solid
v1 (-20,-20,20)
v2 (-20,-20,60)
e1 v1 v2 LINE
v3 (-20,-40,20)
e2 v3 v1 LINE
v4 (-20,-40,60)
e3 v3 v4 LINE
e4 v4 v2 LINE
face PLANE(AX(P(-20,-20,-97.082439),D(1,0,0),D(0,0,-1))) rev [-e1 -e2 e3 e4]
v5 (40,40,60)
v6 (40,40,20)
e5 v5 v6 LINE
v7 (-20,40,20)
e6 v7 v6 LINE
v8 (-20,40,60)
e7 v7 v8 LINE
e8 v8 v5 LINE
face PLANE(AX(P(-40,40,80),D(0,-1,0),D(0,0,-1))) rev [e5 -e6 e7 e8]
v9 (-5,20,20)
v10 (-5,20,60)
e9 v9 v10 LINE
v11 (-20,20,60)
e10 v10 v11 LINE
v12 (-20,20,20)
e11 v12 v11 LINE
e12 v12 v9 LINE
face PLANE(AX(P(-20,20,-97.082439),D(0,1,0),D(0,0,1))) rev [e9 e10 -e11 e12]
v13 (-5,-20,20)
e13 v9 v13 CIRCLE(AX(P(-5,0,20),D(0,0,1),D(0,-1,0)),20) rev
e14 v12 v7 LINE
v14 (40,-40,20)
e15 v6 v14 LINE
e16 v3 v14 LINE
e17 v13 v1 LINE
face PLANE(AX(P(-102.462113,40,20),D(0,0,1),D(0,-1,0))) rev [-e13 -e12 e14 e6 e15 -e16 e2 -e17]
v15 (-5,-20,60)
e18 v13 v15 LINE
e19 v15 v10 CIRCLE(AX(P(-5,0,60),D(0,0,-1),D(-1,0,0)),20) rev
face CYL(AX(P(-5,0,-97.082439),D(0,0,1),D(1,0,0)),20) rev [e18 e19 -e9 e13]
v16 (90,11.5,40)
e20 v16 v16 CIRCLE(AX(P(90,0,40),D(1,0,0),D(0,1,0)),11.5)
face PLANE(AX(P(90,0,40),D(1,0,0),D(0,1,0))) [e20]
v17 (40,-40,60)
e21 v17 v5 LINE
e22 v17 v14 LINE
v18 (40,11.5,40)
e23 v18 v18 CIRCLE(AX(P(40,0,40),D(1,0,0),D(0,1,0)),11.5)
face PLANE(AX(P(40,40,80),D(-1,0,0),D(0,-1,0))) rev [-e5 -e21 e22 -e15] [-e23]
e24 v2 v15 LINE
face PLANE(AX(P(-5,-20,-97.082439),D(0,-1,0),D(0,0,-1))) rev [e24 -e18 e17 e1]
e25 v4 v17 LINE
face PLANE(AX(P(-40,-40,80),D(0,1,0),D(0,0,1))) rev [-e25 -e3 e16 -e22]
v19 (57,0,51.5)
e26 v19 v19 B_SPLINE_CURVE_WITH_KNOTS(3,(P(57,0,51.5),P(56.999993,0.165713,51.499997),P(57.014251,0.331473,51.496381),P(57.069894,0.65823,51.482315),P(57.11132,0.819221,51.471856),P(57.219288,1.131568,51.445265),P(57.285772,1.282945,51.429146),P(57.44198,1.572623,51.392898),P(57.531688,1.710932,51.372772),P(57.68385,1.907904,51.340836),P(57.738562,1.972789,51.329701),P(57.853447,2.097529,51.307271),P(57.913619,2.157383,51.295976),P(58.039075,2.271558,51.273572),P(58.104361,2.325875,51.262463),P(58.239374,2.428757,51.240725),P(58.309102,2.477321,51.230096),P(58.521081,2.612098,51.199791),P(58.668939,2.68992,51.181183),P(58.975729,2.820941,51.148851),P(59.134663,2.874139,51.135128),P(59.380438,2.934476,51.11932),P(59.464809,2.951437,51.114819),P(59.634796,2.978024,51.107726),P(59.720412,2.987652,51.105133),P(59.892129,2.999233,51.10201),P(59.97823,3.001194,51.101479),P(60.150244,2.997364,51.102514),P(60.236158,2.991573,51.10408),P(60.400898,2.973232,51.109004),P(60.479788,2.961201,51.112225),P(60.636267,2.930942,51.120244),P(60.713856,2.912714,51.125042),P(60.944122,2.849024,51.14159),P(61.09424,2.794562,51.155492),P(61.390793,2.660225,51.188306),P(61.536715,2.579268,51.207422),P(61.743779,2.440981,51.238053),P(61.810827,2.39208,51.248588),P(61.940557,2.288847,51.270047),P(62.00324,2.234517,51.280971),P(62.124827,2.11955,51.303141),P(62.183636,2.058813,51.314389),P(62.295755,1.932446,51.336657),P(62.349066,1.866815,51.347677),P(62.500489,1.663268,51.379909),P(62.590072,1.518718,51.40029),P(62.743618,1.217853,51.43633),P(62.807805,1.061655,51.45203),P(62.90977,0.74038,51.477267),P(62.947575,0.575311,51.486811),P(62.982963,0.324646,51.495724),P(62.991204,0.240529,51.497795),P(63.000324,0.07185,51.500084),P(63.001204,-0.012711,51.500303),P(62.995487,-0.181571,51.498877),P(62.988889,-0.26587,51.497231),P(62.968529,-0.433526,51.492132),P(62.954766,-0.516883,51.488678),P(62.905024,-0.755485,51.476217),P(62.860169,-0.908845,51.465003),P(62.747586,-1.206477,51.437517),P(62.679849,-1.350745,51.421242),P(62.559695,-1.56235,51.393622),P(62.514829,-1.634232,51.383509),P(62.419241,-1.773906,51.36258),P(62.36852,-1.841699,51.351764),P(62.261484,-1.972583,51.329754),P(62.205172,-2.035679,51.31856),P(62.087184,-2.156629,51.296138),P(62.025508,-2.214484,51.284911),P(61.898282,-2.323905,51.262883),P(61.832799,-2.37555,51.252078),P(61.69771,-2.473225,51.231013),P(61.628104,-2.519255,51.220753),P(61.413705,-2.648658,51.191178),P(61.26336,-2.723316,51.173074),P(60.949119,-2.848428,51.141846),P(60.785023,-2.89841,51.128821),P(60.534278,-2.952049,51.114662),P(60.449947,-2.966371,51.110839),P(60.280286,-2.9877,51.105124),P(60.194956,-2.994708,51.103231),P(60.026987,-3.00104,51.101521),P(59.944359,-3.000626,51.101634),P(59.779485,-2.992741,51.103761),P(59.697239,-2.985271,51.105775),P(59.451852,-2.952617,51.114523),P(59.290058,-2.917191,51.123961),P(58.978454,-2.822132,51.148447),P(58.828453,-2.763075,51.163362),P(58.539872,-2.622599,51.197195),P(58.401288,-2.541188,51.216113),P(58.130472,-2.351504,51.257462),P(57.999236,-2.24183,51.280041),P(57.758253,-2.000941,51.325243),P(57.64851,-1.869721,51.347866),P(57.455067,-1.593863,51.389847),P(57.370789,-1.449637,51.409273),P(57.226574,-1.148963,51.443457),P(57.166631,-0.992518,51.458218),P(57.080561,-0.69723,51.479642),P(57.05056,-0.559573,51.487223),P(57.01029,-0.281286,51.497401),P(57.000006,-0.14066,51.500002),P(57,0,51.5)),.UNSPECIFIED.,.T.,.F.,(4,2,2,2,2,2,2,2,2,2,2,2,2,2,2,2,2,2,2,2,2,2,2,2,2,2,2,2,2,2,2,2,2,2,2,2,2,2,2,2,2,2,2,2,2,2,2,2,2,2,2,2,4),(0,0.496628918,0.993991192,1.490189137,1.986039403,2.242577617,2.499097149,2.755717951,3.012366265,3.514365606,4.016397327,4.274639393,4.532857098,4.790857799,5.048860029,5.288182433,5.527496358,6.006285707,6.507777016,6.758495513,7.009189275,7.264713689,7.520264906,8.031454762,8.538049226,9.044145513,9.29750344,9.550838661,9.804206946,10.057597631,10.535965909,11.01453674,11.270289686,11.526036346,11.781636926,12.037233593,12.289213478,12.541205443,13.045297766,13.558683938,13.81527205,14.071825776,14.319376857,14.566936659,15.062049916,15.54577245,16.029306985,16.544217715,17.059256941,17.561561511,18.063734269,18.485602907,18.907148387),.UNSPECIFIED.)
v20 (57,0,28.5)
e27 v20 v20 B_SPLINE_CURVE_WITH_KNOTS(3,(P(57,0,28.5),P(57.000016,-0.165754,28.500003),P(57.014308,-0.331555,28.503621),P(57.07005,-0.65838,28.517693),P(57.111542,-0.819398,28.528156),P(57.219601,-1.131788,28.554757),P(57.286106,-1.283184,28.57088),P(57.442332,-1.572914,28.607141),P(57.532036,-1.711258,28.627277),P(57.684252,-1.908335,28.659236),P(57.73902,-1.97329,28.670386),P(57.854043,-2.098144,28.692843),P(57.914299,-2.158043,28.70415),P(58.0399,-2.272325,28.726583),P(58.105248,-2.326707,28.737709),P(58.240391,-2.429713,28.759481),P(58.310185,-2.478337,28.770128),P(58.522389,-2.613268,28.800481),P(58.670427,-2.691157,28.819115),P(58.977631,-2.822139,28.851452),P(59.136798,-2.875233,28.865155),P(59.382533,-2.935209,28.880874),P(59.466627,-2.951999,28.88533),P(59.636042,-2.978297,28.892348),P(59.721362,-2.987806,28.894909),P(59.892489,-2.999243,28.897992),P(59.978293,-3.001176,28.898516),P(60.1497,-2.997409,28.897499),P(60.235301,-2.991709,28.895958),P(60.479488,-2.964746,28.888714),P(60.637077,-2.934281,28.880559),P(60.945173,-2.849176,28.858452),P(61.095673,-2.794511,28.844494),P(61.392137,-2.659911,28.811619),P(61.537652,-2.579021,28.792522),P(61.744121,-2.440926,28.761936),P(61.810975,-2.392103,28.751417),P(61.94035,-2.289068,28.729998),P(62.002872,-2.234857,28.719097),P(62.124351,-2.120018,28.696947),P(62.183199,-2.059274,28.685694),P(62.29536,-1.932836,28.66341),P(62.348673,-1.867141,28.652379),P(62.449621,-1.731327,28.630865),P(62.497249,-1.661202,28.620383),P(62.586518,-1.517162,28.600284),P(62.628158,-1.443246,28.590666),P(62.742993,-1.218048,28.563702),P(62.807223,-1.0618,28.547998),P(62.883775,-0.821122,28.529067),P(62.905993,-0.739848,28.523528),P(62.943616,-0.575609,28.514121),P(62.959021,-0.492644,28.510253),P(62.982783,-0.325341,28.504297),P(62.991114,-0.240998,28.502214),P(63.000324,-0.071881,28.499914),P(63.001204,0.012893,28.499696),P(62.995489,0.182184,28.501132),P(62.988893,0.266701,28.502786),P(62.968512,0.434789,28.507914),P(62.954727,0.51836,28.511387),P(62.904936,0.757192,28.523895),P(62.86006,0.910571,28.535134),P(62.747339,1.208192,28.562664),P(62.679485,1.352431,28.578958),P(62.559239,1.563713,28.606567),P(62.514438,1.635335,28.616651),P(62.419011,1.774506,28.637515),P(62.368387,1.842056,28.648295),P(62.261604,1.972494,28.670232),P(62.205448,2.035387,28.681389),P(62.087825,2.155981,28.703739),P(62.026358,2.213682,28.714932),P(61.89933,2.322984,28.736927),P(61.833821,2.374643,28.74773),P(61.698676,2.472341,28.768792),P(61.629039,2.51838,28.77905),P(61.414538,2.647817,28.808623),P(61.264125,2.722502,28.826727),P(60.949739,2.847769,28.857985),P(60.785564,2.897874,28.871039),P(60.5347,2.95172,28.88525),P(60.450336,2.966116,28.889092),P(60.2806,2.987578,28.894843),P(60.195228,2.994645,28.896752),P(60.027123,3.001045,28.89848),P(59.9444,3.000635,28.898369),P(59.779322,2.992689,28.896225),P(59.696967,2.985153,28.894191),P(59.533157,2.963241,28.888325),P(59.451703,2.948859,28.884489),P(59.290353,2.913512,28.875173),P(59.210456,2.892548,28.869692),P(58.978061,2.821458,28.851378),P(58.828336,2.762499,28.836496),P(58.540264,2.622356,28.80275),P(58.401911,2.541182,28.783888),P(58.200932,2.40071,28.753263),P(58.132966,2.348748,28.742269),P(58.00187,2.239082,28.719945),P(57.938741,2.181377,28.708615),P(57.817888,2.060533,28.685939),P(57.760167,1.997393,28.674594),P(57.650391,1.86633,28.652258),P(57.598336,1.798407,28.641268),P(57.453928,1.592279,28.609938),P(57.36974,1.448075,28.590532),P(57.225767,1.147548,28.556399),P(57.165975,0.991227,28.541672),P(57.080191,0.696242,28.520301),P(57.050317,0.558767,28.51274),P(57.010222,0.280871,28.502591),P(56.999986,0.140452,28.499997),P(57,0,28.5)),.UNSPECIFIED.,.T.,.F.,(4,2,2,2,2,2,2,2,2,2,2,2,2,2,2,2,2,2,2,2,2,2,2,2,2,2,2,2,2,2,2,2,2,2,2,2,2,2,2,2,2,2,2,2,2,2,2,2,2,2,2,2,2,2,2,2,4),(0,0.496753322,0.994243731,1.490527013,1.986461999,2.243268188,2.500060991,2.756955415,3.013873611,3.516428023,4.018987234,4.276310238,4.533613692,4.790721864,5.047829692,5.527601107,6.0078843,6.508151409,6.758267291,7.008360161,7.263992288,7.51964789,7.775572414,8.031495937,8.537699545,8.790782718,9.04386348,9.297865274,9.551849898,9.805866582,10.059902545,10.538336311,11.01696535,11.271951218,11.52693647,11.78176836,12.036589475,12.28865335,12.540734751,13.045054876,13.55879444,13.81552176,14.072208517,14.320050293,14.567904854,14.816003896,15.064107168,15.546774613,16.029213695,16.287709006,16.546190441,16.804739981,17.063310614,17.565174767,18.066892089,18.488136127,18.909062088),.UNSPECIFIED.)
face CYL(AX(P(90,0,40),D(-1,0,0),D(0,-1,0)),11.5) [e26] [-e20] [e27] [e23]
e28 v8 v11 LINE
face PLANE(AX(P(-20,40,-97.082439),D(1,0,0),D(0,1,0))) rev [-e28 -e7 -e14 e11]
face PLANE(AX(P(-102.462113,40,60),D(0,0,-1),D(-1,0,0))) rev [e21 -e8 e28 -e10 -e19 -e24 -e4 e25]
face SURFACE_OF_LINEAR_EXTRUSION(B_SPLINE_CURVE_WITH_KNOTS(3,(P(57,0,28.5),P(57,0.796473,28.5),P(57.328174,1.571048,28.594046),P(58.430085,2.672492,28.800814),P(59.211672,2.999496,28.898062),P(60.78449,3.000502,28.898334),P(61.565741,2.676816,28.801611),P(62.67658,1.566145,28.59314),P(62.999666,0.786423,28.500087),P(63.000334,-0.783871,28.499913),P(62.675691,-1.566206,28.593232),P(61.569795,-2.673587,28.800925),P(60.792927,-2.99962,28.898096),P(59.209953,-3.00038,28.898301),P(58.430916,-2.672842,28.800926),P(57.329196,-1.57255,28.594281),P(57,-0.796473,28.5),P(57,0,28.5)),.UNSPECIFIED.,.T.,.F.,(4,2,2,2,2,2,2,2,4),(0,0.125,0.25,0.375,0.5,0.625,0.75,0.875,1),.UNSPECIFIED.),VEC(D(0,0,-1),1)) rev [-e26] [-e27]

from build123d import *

# Parameters (mm, degrees)
CROQUIS1_W              = 80
CROQUIS1_H              = 80
SALIENTE_EXTRUIR1_DEPTH = 80
CROQUIS3_R              = 11.5
SALIENTE_EXTRUIR2_DEPTH = 50
CORTAR_EXTRUIR1_START   = 28.499999898
CORTAR_EXTRUIR1_DEPTH   = 23.000000204
CORTAR_EXTRUIR2_DEPTH   = 80
CORTAR_EXTRUIR3_START   = 40
CROQUIS7_W              = 20
CROQUIS7_H              = 80
CORTAR_EXTRUIR3_DEPTH   = 60


# Read off the part's stored shape, not the designer's step: Cortar-Extruir1
with BuildPart() as part:
    # Croquis1 → Saliente-Extruir1 (new body)
    with BuildSketch(Plane.XY):
        Rectangle(CROQUIS1_W, CROQUIS1_H)
    extrude(amount=SALIENTE_EXTRUIR1_DEPTH)

    # Croquis3 → Saliente-Extruir2 (add)
    with BuildSketch(Plane(origin=(40, 0, 0), x_dir=(0, 0, -1), z_dir=(1, 0, 0))):
        with Locations(Location((-40, 0, 0), (0, 0, 90))):
            Circle(CROQUIS3_R)
    extrude(amount=SALIENTE_EXTRUIR2_DEPTH)

    # Cortar-Extruir1 outline → Cortar-Extruir1 (cut)
    with BuildSketch(Plane.XY.offset(CORTAR_EXTRUIR1_START)):
        with BuildLine():
            add(Edge.make_bspline(
                [(57, 0), (57, 0.79647294), (57.328173799, 1.571048026), (58.430085354, 2.672492311), (59.211671862, 2.999496362), (60.78449026, 3.00050241), (61.565740512, 2.676816215), (62.676579515, 1.566145107), (62.999665754, 0.786423133), (63.000333703, -0.783870942), (62.675691102, -1.566206232), (61.569794846, -2.673587285), (60.79292663, -2.999619771), (59.20995314, -3.000379538), (58.430916235, -2.672841833), (57.329196069, -1.57255006), (57, -0.79647294), (57, 0)],
                knots=[0, 0, 0, 0, 0.125, 0.125, 0.25, 0.25, 0.375, 0.375, 0.5, 0.5, 0.625, 0.625, 0.75, 0.75, 0.875, 0.875, 1, 1, 1, 1], degree=3))
        make_face()
    extrude(amount=CORTAR_EXTRUIR1_DEPTH, mode=Mode.SUBTRACT)

    # Croquis5 → Cortar-Extruir2 (cut)
    with BuildSketch(Plane.XY.offset(80)):
        with BuildLine():
            Line((-20, 40), (-20, 20))
            Line((-20, 20), (-5, 20))
            ThreePointArc((-5, 20), (15, 0), (-5, -20))
            Line((-5, -20), (-20, -20))
            Line((-20, -20), (-20, -40))
            Line((-20, -40), (-40, -40))
            Line((-40, -40), (-40, 40))
            Line((-40, 40), (-20, 40))
        make_face()
    extrude(amount=-CORTAR_EXTRUIR2_DEPTH, mode=Mode.SUBTRACT)

    # Croquis7 → Cortar-Extruir3 (cut)
    with BuildSketch(Plane(origin=(0, 0, 0), x_dir=(0, 0, -1), z_dir=(1, 0, 0)).offset(CORTAR_EXTRUIR3_START)):
        with Locations((-70, 0)):
            Rectangle(CROQUIS7_W, CROQUIS7_H)
        with Locations((-10, 0)):
            Rectangle(CROQUIS7_W, CROQUIS7_H)
    extrude(amount=-CORTAR_EXTRUIR3_DEPTH, mode=Mode.SUBTRACT)


solid = part.part
